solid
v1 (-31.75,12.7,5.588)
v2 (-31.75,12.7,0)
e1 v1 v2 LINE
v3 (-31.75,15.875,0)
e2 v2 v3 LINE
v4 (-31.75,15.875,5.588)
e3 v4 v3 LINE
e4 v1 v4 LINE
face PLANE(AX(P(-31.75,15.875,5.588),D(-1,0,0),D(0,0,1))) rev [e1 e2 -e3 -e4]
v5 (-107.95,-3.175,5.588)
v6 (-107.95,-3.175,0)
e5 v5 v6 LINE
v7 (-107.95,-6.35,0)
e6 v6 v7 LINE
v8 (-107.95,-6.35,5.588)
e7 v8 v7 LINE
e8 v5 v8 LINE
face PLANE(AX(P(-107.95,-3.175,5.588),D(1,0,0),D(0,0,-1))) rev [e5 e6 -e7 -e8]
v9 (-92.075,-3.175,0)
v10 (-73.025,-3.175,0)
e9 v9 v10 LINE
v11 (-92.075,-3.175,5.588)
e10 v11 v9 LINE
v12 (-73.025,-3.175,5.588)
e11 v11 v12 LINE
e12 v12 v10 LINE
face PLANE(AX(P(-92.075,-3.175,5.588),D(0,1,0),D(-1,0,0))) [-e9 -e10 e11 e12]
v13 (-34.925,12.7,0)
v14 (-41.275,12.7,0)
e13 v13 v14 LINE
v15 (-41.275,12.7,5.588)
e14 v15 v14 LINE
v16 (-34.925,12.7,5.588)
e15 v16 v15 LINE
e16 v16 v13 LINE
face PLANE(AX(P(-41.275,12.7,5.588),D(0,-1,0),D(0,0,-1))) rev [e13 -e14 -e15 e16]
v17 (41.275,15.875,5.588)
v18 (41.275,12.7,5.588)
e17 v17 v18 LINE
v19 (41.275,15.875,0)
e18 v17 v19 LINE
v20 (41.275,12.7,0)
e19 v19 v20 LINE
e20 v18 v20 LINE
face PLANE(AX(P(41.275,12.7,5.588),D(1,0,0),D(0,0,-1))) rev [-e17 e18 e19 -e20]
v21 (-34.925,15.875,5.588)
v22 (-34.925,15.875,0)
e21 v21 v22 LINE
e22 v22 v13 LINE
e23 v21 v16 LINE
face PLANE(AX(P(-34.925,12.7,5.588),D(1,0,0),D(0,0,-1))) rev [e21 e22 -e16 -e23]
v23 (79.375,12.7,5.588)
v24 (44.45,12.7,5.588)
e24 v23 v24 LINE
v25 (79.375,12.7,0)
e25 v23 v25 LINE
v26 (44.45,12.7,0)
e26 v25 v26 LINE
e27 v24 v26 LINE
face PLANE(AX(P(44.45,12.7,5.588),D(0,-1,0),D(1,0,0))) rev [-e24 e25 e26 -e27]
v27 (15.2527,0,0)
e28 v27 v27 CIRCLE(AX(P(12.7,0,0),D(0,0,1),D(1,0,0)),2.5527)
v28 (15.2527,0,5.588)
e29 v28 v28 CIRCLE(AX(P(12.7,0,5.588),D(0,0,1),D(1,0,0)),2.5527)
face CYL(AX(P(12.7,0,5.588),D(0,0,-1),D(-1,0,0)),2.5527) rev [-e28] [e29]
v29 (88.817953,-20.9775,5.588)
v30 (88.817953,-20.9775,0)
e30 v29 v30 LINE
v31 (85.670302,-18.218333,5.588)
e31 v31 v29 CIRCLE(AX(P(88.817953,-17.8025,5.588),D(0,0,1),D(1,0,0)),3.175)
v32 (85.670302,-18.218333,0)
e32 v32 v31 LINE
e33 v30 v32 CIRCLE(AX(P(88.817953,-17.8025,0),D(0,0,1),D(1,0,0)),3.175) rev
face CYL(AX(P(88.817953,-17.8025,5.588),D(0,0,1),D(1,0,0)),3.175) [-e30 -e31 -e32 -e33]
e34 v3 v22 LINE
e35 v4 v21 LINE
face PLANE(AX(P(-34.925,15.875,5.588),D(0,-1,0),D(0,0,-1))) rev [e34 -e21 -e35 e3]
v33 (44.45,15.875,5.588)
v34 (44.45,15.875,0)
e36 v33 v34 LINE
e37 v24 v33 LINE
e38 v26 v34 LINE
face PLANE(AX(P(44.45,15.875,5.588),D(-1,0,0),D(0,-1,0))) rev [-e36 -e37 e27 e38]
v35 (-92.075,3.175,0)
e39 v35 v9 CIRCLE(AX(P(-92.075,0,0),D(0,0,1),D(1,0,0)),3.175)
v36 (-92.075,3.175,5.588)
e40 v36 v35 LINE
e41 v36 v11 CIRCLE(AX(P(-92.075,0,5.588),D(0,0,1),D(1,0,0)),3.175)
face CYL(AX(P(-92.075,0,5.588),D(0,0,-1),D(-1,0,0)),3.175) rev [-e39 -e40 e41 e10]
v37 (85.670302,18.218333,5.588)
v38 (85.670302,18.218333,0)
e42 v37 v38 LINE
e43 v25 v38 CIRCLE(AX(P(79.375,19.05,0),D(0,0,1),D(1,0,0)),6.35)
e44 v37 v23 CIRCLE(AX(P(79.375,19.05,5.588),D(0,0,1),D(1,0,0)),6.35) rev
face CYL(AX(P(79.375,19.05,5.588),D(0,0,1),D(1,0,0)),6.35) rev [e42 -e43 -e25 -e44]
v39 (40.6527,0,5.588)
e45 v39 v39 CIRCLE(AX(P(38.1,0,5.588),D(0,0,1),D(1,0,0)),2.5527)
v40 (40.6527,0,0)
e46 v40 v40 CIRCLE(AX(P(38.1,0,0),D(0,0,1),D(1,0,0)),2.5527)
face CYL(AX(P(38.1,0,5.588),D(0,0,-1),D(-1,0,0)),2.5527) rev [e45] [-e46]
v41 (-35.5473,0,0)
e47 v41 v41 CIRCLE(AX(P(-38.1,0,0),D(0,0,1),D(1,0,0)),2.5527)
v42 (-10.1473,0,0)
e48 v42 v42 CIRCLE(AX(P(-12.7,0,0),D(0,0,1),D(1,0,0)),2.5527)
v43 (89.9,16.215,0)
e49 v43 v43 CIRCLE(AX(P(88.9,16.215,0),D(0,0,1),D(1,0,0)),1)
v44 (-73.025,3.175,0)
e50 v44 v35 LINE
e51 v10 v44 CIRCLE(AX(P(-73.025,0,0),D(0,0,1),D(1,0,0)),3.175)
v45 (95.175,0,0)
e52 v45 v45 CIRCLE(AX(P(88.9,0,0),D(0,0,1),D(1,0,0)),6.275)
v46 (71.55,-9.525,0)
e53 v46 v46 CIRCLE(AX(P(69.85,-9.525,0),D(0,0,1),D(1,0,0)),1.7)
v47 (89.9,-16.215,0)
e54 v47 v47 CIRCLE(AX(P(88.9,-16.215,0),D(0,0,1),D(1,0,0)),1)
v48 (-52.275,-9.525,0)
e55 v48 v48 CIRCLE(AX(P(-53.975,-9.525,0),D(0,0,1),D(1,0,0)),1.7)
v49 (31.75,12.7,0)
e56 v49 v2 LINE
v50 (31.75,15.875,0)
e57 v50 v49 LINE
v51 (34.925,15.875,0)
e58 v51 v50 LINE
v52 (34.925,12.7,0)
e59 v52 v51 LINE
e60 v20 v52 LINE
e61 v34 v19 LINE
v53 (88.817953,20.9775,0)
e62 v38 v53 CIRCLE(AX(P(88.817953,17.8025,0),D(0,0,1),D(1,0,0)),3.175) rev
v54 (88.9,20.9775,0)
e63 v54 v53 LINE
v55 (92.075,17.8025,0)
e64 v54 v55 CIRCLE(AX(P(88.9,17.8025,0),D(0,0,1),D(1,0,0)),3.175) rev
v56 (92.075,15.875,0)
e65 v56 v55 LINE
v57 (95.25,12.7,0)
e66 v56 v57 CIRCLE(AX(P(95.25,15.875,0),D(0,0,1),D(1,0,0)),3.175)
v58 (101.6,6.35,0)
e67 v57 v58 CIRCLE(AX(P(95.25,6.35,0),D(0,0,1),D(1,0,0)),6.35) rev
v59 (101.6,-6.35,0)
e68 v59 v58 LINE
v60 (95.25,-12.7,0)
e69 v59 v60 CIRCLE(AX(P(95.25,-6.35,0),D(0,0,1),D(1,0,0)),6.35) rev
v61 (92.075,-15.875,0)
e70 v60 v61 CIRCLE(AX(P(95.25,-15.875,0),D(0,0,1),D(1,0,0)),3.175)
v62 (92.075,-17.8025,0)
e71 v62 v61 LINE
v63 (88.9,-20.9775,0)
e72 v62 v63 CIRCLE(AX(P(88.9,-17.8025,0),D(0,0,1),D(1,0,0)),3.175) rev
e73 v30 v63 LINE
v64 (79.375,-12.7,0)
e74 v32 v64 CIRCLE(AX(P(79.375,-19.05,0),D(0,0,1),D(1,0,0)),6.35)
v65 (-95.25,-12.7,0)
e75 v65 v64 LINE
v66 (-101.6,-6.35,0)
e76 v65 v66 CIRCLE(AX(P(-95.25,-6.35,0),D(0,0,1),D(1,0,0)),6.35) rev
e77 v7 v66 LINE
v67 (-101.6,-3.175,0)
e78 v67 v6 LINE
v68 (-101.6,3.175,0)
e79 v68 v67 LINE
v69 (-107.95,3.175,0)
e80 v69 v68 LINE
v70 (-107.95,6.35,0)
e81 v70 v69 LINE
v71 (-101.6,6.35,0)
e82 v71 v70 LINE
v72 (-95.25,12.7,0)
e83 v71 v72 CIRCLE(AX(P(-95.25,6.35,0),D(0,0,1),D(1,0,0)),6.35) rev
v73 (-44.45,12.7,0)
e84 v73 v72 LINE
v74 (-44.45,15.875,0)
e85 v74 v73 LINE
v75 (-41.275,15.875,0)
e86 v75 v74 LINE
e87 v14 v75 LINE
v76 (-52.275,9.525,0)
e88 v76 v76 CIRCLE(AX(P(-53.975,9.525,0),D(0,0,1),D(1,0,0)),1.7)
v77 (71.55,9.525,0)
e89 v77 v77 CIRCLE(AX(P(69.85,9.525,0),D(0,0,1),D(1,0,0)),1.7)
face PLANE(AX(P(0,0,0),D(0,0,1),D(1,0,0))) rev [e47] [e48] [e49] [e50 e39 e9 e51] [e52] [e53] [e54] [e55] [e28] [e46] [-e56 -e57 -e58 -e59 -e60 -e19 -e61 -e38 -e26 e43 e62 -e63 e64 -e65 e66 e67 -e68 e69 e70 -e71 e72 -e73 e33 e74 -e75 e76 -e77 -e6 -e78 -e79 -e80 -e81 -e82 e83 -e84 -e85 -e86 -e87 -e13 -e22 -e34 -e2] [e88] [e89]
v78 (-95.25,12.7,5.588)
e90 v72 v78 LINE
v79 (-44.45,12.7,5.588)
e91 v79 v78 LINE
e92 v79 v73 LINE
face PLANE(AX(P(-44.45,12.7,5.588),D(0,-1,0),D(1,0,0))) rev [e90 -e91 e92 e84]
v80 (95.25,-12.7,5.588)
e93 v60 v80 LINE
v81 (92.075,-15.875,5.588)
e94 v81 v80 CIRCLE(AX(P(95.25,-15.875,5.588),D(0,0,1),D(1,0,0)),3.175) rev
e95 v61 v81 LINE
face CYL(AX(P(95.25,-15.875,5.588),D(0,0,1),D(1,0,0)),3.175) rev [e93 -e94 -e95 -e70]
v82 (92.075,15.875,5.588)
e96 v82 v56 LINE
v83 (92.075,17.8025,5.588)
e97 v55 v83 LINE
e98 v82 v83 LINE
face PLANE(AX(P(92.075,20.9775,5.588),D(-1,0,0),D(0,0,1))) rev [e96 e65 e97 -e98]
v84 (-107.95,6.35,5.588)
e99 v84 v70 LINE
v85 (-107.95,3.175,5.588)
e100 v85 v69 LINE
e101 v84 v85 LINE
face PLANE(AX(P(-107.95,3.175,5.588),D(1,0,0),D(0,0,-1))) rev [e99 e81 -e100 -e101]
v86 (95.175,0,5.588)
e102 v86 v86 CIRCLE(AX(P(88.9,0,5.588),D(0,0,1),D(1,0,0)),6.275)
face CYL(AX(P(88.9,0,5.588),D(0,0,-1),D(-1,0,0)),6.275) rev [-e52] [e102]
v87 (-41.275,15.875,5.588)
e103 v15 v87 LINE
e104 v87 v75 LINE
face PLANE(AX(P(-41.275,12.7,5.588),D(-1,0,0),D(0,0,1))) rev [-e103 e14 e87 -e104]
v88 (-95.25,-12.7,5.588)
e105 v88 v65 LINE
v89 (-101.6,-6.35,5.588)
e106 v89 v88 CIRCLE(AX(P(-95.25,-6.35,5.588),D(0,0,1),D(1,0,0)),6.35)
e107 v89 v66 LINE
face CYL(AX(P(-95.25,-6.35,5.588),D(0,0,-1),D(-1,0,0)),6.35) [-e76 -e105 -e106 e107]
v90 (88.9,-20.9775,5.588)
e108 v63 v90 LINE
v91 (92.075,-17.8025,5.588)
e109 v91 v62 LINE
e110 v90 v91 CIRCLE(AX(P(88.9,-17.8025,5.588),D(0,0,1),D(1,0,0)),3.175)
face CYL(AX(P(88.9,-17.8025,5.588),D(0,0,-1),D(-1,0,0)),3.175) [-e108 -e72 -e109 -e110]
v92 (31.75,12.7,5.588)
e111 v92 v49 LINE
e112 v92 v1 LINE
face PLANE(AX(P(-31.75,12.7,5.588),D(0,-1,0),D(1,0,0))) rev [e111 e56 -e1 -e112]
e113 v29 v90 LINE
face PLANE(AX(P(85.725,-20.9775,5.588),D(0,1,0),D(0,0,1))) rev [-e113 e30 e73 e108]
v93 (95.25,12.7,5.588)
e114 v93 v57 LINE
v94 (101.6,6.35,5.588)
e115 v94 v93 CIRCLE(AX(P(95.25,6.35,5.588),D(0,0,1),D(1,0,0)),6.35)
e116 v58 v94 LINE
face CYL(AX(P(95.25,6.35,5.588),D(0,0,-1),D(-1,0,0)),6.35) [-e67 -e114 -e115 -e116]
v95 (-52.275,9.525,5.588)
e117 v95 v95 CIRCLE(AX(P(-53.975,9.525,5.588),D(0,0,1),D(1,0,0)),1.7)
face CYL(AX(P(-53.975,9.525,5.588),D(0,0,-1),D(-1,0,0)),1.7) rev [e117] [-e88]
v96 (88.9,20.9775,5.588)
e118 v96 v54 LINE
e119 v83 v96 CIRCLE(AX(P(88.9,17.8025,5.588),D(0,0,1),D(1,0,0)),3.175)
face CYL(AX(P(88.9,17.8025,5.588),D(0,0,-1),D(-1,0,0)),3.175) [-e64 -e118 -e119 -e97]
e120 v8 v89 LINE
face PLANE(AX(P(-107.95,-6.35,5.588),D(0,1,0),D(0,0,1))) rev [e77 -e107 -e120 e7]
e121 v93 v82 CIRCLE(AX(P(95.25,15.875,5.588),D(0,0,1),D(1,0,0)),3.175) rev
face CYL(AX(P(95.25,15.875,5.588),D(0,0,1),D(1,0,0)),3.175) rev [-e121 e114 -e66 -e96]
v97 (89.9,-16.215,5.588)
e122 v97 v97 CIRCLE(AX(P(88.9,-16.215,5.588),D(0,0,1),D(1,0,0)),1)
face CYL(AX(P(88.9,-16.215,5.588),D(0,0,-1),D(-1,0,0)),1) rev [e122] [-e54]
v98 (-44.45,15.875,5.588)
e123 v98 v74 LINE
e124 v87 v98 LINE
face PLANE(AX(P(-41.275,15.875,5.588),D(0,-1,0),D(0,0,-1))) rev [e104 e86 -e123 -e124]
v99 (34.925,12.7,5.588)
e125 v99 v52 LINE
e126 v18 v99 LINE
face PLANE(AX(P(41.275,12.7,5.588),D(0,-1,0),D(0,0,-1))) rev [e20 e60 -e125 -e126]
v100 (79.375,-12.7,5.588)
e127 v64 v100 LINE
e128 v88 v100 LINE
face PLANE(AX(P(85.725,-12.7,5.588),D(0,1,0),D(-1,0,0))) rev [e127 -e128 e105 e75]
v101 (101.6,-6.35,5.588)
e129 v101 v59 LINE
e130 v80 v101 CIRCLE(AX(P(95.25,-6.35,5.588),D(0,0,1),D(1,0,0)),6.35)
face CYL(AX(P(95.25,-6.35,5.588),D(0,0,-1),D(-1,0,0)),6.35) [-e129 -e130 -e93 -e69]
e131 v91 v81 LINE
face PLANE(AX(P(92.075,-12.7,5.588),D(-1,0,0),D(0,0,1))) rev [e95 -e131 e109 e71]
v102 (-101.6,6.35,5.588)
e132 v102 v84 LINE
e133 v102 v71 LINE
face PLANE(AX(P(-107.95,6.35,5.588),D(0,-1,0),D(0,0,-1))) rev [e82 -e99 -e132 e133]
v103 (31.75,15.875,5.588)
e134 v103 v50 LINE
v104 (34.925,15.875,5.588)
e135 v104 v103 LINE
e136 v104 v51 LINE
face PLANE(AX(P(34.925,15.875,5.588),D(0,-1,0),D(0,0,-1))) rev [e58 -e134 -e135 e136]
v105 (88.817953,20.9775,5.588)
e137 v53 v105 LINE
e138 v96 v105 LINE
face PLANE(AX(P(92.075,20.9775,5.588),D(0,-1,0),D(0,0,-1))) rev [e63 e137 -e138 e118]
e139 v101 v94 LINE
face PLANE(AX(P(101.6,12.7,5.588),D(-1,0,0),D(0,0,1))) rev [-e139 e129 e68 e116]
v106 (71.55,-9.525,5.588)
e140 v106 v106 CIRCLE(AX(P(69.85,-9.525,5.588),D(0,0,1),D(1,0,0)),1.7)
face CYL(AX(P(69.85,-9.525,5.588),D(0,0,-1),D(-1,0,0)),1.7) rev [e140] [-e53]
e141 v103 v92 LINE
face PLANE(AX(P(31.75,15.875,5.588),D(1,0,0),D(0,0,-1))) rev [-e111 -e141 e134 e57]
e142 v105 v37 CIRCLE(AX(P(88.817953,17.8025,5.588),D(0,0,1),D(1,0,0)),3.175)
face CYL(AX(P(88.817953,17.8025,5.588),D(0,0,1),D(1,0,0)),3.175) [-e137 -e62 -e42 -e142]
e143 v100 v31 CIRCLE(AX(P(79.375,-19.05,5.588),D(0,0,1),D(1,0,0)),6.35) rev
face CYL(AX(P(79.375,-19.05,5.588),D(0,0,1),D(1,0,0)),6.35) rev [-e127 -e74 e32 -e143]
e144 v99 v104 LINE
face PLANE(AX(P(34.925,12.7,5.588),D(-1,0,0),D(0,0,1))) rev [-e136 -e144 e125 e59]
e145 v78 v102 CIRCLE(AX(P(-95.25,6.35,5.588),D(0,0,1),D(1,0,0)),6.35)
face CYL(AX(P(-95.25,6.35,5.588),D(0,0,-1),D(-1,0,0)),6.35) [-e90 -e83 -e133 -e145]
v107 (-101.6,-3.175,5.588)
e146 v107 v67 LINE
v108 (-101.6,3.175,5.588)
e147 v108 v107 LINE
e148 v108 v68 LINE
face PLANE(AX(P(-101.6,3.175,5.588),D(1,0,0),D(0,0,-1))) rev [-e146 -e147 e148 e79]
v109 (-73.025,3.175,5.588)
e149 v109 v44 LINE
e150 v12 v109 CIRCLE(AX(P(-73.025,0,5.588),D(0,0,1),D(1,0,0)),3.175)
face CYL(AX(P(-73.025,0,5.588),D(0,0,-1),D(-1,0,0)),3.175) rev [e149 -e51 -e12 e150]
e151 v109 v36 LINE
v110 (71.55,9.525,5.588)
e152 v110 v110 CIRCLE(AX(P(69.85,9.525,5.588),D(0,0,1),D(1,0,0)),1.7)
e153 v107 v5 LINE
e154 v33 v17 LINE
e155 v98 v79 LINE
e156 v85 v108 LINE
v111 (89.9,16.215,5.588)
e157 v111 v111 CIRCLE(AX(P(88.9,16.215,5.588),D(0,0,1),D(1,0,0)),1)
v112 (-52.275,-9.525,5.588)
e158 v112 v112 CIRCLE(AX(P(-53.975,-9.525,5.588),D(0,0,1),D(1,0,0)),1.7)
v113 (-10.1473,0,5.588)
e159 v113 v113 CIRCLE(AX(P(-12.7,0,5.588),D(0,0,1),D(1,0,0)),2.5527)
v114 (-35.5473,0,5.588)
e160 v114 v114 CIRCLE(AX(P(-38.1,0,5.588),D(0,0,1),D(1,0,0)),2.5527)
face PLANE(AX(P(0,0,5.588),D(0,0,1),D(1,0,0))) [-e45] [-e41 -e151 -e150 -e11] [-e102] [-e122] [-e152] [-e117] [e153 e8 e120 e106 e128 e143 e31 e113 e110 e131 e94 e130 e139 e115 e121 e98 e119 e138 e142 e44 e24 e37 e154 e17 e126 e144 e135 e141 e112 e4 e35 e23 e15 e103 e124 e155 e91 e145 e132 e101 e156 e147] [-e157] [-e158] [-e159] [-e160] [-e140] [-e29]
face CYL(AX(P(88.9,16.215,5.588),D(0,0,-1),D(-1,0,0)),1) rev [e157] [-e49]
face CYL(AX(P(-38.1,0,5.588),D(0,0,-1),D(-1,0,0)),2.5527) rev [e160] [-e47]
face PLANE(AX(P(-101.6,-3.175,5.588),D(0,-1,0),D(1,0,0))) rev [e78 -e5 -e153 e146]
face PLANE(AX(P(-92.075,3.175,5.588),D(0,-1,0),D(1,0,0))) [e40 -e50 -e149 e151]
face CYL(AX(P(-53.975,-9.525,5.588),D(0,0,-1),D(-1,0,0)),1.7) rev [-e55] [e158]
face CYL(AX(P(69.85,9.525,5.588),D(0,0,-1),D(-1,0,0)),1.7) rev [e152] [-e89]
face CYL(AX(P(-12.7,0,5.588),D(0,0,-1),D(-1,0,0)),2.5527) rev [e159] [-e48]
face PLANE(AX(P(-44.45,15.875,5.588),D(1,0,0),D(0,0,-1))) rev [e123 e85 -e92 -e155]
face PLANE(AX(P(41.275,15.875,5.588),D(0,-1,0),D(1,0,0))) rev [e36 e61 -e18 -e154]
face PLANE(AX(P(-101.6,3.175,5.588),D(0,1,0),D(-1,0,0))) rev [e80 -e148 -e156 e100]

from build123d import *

# Parameters (mm, degrees)
SKETCH2_R           = 1.7
SKETCH2_R_2         = 2.5527
SKETCH2_R_3         = 1
SKETCH2_R_4         = 6.275
BOSS_EXTRUDE1_DEPTH = 5.588
FILLET1_R           = 6.35
FILLET2_R           = 3.175


with BuildPart() as part:
    # Sketch2 → Boss-Extrude1 (new body)
    with BuildSketch(Plane.XY):
        Polygon((-44.45, 12.7), (-101.6, 12.7), (-101.6, 6.35), (-107.95, 6.35), (-107.95, 3.175), (-101.6, 3.175), (-101.6, -3.175), (-107.95, -3.175), (-107.95, -6.35), (-101.6, -6.35), (-101.6, -12.7), (85.725, -12.7), (85.725, -20.9775), (92.075, -20.9775), (92.075, -12.7), (101.6, -12.7), (101.6, 12.7), (92.075, 12.7), (92.075, 20.9775), (85.725, 20.9775), (85.725, 12.7), (44.45, 12.7), (44.45, 15.875), (41.275, 15.875), (41.275, 12.7), (34.925, 12.7), (34.925, 15.875), (31.75, 15.875), (31.75, 12.7), (-31.75, 12.7), (-31.75, 15.875), (-34.925, 15.875), (-34.925, 12.7), (-41.275, 12.7), (-41.275, 15.875), (-44.45, 15.875), align=None)
        with BuildLine():
            ThreePointArc((-92.075, -3.175), (-95.25, 0), (-92.075, 3.175))
            Line((-92.075, 3.175), (-73.025, 3.175))
            ThreePointArc((-73.025, 3.175), (-69.85, 0), (-73.025, -3.175))
            Line((-73.025, -3.175), (-92.075, -3.175))
        make_face(mode=Mode.SUBTRACT)
        with Locations((-53.975, -9.525)):
            Circle(SKETCH2_R, mode=Mode.SUBTRACT)
        with Locations((-38.1, 0)):
            Circle(SKETCH2_R_2, mode=Mode.SUBTRACT)
        with Locations((-12.7, 0)):
            Circle(SKETCH2_R_2, mode=Mode.SUBTRACT)
        with Locations((88.9, -16.215)):
            Circle(SKETCH2_R_3, mode=Mode.SUBTRACT)
        with Locations((12.7, 0)):
            Circle(SKETCH2_R_2, mode=Mode.SUBTRACT)
        with Locations((38.1, 0)):
            Circle(SKETCH2_R_2, mode=Mode.SUBTRACT)
        with Locations((69.85, -9.525)):
            Circle(SKETCH2_R, mode=Mode.SUBTRACT)
        with Locations((88.9, 0)):
            Circle(SKETCH2_R_4, mode=Mode.SUBTRACT)
        with Locations((-53.975, 9.525)):
            Circle(SKETCH2_R, mode=Mode.SUBTRACT)
        with Locations((69.85, 9.525)):
            Circle(SKETCH2_R, mode=Mode.SUBTRACT)
        with Locations((88.9, 16.215)):
            Circle(SKETCH2_R_3, mode=Mode.SUBTRACT)
    extrude(amount=BOSS_EXTRUDE1_DEPTH)

    # Fillet1
    fillet1_edges = [part.edges().sort_by_distance(p)[0] for p in [
        (101.6, -12.7, 2.794),
        (101.6, 12.7, 2.794),
        (-101.6, -12.7, 2.794),
        (-101.6, 12.7, 2.794),
        (85.725, -12.7, 2.794),
        (85.725, 12.7, 2.794),
    ]]
    fillet(fillet1_edges, radius=FILLET1_R - 0.0001)  # a hair under: the kernel refuses the full size

    # Fillet2
    fillet2_edges = [part.edges().sort_by_distance(p)[0] for p in [
        (85.725, -20.9775, 2.794),
        (92.075, -20.9775, 2.794),
        (92.075, -12.7, 2.794),
        (92.075, 12.7, 2.794),
        (92.075, 20.9775, 2.794),
        (85.725, 20.9775, 2.794),
    ]]
    fillet(fillet2_edges, radius=FILLET2_R)


solid = part.part
